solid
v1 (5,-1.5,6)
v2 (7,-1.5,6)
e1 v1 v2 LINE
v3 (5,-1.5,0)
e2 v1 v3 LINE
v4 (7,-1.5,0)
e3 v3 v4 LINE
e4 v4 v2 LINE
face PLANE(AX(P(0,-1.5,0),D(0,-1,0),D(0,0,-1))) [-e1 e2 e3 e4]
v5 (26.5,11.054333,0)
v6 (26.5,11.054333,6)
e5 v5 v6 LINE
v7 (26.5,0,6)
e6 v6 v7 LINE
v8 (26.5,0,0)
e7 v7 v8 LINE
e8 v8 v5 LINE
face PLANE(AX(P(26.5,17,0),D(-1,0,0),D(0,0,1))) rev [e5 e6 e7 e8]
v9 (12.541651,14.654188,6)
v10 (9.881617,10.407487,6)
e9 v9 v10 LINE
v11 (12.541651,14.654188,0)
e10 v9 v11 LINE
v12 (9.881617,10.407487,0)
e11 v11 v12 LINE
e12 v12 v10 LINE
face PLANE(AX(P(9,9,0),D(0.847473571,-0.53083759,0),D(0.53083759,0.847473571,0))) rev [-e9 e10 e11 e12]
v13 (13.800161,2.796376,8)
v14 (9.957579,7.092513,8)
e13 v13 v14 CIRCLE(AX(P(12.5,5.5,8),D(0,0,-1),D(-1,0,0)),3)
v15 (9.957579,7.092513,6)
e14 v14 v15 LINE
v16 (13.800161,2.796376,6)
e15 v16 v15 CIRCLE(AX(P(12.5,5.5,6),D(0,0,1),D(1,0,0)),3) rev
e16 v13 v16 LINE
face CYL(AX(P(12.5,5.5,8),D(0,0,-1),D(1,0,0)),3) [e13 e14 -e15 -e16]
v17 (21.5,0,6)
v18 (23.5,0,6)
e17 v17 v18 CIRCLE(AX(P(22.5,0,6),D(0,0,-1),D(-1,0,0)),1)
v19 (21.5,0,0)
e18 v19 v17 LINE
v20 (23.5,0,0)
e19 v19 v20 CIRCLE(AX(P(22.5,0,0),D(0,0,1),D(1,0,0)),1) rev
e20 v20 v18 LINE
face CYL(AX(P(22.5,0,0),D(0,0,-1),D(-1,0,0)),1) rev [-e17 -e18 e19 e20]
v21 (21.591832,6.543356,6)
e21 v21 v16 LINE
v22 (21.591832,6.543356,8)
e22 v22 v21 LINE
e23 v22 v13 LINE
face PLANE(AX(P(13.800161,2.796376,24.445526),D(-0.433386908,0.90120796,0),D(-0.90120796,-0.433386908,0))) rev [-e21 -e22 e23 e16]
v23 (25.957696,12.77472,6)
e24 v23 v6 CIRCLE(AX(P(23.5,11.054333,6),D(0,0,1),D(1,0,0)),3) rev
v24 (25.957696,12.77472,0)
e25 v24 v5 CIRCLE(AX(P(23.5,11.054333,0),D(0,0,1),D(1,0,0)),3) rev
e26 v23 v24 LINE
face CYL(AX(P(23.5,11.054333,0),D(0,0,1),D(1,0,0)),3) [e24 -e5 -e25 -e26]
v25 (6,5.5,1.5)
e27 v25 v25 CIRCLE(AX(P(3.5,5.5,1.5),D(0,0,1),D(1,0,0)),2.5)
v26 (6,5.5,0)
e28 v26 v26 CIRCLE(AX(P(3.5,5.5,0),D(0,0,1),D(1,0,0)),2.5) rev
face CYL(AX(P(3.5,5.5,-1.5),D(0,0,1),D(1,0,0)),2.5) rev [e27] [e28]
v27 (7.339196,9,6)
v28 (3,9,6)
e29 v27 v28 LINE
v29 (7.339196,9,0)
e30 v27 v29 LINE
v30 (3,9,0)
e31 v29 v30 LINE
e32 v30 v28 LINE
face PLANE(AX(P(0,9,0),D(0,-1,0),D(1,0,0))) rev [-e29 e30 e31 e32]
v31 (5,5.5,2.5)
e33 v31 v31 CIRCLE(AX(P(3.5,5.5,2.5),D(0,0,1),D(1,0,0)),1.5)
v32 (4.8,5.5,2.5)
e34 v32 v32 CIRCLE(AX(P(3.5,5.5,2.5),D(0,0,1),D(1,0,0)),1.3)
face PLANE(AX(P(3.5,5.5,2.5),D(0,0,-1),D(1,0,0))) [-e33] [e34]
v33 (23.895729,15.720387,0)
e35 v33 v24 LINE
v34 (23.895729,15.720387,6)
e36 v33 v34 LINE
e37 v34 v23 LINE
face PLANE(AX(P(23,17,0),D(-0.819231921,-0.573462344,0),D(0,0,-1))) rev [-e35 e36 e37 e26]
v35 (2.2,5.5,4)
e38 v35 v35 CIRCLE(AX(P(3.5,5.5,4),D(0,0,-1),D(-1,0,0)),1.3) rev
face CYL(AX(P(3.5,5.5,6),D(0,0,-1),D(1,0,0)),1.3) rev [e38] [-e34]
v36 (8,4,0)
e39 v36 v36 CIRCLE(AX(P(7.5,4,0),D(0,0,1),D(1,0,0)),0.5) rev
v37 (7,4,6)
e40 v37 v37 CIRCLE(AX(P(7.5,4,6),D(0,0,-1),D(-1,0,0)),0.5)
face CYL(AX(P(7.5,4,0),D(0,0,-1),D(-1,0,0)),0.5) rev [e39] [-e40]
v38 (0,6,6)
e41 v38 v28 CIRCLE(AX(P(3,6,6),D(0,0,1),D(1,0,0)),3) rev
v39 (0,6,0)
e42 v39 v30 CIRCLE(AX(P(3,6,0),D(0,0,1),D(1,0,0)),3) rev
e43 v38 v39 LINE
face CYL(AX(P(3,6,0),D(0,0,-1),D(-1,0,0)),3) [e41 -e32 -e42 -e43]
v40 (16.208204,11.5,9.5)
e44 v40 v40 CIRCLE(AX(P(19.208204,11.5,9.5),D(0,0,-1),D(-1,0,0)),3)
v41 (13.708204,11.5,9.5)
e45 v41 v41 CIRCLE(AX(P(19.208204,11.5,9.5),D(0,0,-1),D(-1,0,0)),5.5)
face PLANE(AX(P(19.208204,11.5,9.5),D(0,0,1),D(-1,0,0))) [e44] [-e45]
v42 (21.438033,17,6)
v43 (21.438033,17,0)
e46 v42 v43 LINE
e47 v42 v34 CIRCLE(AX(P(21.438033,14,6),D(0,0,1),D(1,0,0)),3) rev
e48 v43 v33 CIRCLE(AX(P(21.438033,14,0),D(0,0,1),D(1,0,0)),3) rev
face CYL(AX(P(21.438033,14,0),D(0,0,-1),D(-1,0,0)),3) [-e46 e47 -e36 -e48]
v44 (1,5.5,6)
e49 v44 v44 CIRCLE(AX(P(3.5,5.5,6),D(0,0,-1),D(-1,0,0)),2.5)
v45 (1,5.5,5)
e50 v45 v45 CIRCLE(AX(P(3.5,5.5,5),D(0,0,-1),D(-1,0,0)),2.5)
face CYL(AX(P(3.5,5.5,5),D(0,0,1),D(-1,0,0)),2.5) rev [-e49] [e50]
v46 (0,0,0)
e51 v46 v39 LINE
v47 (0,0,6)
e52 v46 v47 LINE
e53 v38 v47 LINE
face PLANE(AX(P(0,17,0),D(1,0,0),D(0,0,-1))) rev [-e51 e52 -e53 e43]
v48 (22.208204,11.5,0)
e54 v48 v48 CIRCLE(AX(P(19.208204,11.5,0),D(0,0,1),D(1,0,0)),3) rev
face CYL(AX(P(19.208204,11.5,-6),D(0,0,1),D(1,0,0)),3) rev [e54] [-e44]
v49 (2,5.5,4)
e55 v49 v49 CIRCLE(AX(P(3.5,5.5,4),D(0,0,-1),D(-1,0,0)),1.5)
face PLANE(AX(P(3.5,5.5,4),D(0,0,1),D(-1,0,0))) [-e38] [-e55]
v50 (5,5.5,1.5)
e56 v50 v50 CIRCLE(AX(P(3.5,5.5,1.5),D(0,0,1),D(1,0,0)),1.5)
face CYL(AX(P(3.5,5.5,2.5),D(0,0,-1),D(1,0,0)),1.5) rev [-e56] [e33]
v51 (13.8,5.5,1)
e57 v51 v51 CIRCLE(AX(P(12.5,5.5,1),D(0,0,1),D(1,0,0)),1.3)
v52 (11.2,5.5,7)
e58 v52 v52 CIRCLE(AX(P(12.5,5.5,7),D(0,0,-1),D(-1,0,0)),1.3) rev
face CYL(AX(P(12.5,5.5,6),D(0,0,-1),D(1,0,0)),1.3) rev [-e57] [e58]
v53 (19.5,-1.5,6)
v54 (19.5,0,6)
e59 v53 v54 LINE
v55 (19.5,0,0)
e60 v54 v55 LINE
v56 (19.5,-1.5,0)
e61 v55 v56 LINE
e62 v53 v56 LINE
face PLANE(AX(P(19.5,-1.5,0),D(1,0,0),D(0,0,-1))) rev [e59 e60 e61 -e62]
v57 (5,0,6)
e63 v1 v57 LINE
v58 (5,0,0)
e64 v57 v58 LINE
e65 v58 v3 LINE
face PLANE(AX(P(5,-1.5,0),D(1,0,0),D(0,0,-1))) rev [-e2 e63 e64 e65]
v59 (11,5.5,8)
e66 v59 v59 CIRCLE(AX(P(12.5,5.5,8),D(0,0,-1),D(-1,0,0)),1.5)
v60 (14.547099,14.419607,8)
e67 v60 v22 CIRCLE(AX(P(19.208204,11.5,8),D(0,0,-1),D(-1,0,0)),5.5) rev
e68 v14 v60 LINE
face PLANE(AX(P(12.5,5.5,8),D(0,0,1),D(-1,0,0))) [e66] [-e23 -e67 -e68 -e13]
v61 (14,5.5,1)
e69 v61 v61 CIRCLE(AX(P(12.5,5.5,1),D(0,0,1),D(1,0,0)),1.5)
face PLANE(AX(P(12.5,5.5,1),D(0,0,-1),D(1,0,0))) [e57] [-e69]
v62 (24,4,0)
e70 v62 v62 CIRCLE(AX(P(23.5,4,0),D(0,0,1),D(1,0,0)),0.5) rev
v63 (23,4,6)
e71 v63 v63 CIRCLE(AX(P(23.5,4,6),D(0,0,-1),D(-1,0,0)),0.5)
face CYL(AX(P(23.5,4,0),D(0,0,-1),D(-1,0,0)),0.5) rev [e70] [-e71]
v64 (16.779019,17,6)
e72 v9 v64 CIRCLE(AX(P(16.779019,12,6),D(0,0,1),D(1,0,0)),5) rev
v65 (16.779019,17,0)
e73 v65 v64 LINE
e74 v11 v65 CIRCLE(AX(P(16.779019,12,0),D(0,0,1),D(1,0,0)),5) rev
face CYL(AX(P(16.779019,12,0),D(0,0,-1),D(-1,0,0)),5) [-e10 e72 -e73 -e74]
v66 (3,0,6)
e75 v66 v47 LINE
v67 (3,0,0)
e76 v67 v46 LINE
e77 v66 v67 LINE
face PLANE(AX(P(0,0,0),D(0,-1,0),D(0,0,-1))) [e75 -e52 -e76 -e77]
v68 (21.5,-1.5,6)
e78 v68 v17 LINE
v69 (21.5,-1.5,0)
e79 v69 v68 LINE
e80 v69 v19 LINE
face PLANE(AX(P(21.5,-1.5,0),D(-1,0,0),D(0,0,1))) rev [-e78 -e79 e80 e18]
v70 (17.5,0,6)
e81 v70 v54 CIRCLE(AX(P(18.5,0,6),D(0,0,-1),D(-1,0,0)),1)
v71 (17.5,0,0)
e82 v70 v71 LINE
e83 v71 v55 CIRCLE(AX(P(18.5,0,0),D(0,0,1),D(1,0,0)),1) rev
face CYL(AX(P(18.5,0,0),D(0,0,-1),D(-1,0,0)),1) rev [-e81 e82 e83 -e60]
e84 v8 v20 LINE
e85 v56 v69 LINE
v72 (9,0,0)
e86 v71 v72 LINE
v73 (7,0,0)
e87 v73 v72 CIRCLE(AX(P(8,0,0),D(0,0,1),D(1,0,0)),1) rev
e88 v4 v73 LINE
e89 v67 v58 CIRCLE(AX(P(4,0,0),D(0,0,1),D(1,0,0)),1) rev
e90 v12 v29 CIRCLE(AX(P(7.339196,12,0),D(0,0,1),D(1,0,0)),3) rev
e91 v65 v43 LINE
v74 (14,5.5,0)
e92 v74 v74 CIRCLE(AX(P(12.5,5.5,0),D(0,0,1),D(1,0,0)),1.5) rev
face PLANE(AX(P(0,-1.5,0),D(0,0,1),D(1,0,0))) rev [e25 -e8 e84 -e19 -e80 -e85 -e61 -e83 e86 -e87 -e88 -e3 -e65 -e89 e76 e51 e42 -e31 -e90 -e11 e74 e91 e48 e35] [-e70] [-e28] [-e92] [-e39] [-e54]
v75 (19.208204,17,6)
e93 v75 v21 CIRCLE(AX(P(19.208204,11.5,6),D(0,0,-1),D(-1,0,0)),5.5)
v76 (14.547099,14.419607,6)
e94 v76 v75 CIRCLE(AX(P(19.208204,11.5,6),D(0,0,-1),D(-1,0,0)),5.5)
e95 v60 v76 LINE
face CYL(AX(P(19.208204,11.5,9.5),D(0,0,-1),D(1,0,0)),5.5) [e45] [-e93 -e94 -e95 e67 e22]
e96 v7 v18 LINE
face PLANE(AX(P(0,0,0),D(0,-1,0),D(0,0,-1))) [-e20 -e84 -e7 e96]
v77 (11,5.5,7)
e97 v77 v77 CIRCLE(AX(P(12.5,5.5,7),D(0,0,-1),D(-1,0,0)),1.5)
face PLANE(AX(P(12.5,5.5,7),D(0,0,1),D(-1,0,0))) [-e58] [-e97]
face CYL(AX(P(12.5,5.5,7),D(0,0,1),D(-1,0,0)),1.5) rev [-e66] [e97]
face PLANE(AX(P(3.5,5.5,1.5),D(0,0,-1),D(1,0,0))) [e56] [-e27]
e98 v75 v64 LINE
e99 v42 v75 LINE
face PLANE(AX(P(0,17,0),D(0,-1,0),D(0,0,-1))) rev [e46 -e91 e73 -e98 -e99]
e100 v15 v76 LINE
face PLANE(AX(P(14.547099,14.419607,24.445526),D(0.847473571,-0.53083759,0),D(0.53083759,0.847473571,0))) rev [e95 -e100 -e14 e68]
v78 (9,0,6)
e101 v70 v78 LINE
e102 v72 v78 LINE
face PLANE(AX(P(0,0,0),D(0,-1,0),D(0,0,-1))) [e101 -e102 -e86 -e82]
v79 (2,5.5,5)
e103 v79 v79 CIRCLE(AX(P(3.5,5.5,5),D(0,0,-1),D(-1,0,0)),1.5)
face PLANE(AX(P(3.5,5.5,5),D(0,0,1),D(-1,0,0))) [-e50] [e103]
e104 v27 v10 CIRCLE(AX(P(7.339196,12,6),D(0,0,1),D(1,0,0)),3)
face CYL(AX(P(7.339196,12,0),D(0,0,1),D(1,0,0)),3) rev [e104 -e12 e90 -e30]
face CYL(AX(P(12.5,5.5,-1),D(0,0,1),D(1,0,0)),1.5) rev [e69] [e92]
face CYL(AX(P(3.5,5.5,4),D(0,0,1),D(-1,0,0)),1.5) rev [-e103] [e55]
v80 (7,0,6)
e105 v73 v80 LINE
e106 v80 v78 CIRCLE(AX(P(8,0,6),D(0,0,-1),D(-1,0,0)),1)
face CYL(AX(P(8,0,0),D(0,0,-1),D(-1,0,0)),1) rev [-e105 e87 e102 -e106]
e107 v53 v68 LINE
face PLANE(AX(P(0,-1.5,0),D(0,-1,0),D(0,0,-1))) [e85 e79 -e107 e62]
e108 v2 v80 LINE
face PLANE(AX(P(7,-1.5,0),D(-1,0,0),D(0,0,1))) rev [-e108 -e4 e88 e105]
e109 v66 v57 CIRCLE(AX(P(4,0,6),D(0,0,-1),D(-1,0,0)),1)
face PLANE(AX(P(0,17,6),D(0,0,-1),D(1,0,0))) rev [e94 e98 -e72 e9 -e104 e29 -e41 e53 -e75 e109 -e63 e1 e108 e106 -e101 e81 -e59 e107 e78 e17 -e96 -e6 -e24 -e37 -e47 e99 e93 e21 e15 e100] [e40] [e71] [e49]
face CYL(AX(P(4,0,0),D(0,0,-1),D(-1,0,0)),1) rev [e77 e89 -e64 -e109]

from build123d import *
from build123d.topology import SkipClean

# Parameters (mm, degrees)
SKETCH1_W                            = 26.5
SKETCH1_H                            = 6
BOSS_EXTRUDE1_DEPTH                  = 17
SKETCH2_R                            = 1.5
CUT_EXTRUDE1_DEPTH                   = 1
SKETCH3_R                            = 1.3
CUT_EXTRUDE2_DEPTH                   = 32.878676259
SKETCH4_R                            = 3
CUT_EXTRUDE3_DEPTH                   = 33.050741021
SKETCH5_R                            = 2.5
CUT_EXTRUDE4_DEPTH                   = 1.5
SKETCH6_R                            = 1.5
CUT_EXTRUDE8_DEPTH                   = 1
SKETCH7_R                            = 1.3
CUT_EXTRUDE9_DEPTH                   = 32.678068123
CUT_EXTRUDE10_START                  = -1
SKETCH8_R                            = 2.5
CUT_EXTRUDE10_DEPTH                  = 1
CUT_EXTRUDE11_START                  = -1
SKETCH9_R                            = 1.5
CUT_EXTRUDE11_DEPTH                  = 1
SKETCH10_R                           = 5.5
SKETCH10_R_2                         = 3
BOSS_EXTRUDE2_DEPTH                  = 3.5
SKETCH11_R                           = 3
SKETCH11_R_2                         = 1.3
BOSS_EXTRUDE4_DEPTH                  = 2
CUT_EXTRUDE12_START                  = -1
SKETCH12_R                           = 1.5
CUT_EXTRUDE12_DEPTH                  = 1
SKETCH17_W                           = 2
SKETCH17_H                           = 6
BOSS_EXTRUDE6_DEPTH                  = 1.5
SKETCH18_R                           = 1
CUT_EXTRUDE17_DEPTH                  = 33.050741021
CHAMFER2_SIZE                        = 5
CHAMFER2_SIZE2                       = 3.5
FILLET11_R                           = 3
BOSS_EXTRUDE7_DEPTH                  = 2
CUT_EXTRUDE19_DEPTH                  = 33.050741021
FILLET13_R                           = 5
FILLET14_R                           = 3
FILLET15_R                           = 3
SKIZZE1_R                            = 0.5
SCHNITT_LINEAR_AUSTRAGEN1_DEPTH      = 33.050741021
SPIEGELN1_OUTLINE_R                  = 3
SPIEGELN1_OUTLINE_R_2                = 2.5
SPIEGELN1_OUTLINE_R_3                = 0.5
SPIEGELN1_OUTLINE_R_4                = 1.5
SPIEGELN1_DEPTH                      = 6
SPIEGELN1_START                      = 6
SPIEGELN1_2_OUTLINE_R                = 5.5
SPIEGELN1_2_OUTLINE_R_2              = 3
SPIEGELN1_2_DEPTH                    = 3.5
SPIEGELN1_3_OUTLINE_R                = 1.5
SPIEGELN1_3_DEPTH                    = 2
SPIEGELN1_START_2                    = 1.5
SPIEGELN1_4_OUTLINE_R                = 1.5
SPIEGELN1_4_OUTLINE_R_2              = 1.3
SPIEGELN1_4_OUTLINE_R_3              = 2.5
SPIEGELN1_4_DEPTH                    = 3.5
SPIEGELN1_START_3                    = 1
SPIEGELN1_5_OUTLINE_R                = 1.5
SPIEGELN1_5_OUTLINE_R_2              = 1.3
SPIEGELN1_5_DEPTH                    = 6
SPIEGELN1_START_4                    = 2.5
SPIEGELN1_6_OUTLINE_R                = 1.5
SPIEGELN1_6_OUTLINE_R_2              = 1.3
SPIEGELN1_6_DEPTH                    = 1.5
SCHNITT_LINEAR_AUSTRAGEN2_DEPTH      = 31.409702399
SCHNITT_LINEAR_AUSTRAGEN2_DEPTH_BACK = 31.409702399
SKIZZE2_W                            = 26.5
SKIZZE2_H                            = 9.5


# Read off the part's stored shape, not the designer's step: Spiegeln1
with BuildPart() as part:
    # Sketch1 → Boss-Extrude1 (new body)
    with BuildSketch(Plane(origin=(0, 0, 0), x_dir=(1, 0, 0), z_dir=(0, 1, 0))):
        with Locations((13.25, 3)):
            Rectangle(SKETCH1_W, SKETCH1_H)
    extrude(amount=BOSS_EXTRUDE1_DEPTH)

    # Sketch2 → Cut-Extrude1 (cut)
    with BuildSketch(Plane.XY):
        with Locations((12.5, 5.5)):
            Circle(SKETCH2_R)
    extrude(amount=-CUT_EXTRUDE1_DEPTH, mode=Mode.SUBTRACT)

    # Sketch3 → Cut-Extrude2 (cut, through all)
    with BuildSketch(Plane.XY.offset(-1)):
        with Locations((12.5, 5.5)):
            Circle(SKETCH3_R)
    extrude(amount=-CUT_EXTRUDE2_DEPTH, mode=Mode.SUBTRACT)

    # Sketch4 → Cut-Extrude3 (cut, through all)
    with BuildSketch(Plane.XY):
        with Locations((19.208203932, 11.5)):
            Circle(SKETCH4_R)
    extrude(amount=-CUT_EXTRUDE3_DEPTH, mode=Mode.SUBTRACT)

    # Sketch5 → Cut-Extrude4 (cut)
    with BuildSketch(Plane.XY):
        with Locations((3.5, 5.5)):
            Circle(SKETCH5_R)
    extrude(amount=-CUT_EXTRUDE4_DEPTH, mode=Mode.SUBTRACT)

    # Sketch6 → Cut-Extrude8 (cut)
    with BuildSketch(Plane.XY.offset(-1.5)):
        with Locations((3.5, 5.5)):
            Circle(SKETCH6_R)
    extrude(amount=-CUT_EXTRUDE8_DEPTH, mode=Mode.SUBTRACT)

    # Sketch7 → Cut-Extrude9 (cut, through all)
    with BuildSketch(Plane.XY.offset(-2.5)):
        with Locations((3.5, 5.5)):
            Circle(SKETCH7_R)
    extrude(amount=-CUT_EXTRUDE9_DEPTH, mode=Mode.SUBTRACT)

    # Sketch8 → Cut-Extrude10 (cut)
    with BuildSketch(Plane(origin=(0, 0, -6), x_dir=(-1, 0, 0), z_dir=(0, 0, -1)).offset(CUT_EXTRUDE10_START)):
        with Locations(Location((-3.5, 5.5, 0), (0, 0, 180))):
            Circle(SKETCH8_R)
    extrude(amount=CUT_EXTRUDE10_DEPTH, mode=Mode.SUBTRACT)

    # Sketch9 → Cut-Extrude11 (cut)
    with BuildSketch(Plane(origin=(0, 0, -5), x_dir=(-1, 0, 0), z_dir=(0, 0, -1)).offset(CUT_EXTRUDE11_START)):
        with Locations(Location((-3.5, 5.5, 0), (0, 0, 180))):
            Circle(SKETCH9_R)
    extrude(amount=CUT_EXTRUDE11_DEPTH, mode=Mode.SUBTRACT)

    # Sketch10 → Boss-Extrude2 (add)
    with BuildSketch(Plane(origin=(0, 0, -6), x_dir=(-1, 0, 0), z_dir=(0, 0, -1))):
        with Locations(Location((-19.208203932, 11.5, 0), (0, 0, 90))):
            Circle(SKETCH10_R)
        with Locations(Location((-19.208203932, 11.5, 0), (0, 0, 180))):
            Circle(SKETCH10_R_2, mode=Mode.SUBTRACT)
    extrude(amount=BOSS_EXTRUDE2_DEPTH)

    # Sketch11 → Boss-Extrude4 (add)
    with BuildSketch(Plane(origin=(0, 0, -6), x_dir=(-1, 0, 0), z_dir=(0, 0, -1))):
        with Locations(Location((-12.5, 5.5, 0), (0, 0, 180))):
            Circle(SKETCH11_R)
        with Locations(Location((-12.5, 5.5, 0), (0, 0, 180))):
            Circle(SKETCH11_R_2, mode=Mode.SUBTRACT)
    extrude(amount=BOSS_EXTRUDE4_DEPTH)

    # Sketch12 → Cut-Extrude12 (cut)
    with BuildSketch(Plane(origin=(0, 0, -8), x_dir=(-1, 0, 0), z_dir=(0, 0, -1)).offset(CUT_EXTRUDE12_START)):
        with Locations(Location((-12.5, 5.5, 0), (0, 0, 180))):
            Circle(SKETCH12_R)
    extrude(amount=CUT_EXTRUDE12_DEPTH, mode=Mode.SUBTRACT)

    # Sketch17 → Boss-Extrude6 (add)
    with BuildSketch(Plane.XZ):
        with Locations((6, -3)):
            Rectangle(SKETCH17_W, SKETCH17_H)
        with Locations((20.5, -3)):
            Rectangle(SKETCH17_W, SKETCH17_H)
    extrude(amount=BOSS_EXTRUDE6_DEPTH)

    # Sketch18 → Cut-Extrude17 (cut, through all)
    with BuildSketch(Plane(origin=(0, 0, -6), x_dir=(-1, 0, 0), z_dir=(0, 0, -1))):
        with Locations((-22.5, 0)):
            Circle(SKETCH18_R)
        with Locations((-18.5, 0)):
            Circle(SKETCH18_R)
        with Locations((-8, 0)):
            Circle(SKETCH18_R)
        with Locations((-4, 0)):
            Circle(SKETCH18_R)
    extrude(amount=-CUT_EXTRUDE17_DEPTH, mode=Mode.SUBTRACT)

    # Chamfer2
    chamfer2_edges = [part.edges().sort_by_distance(p)[0] for p in [
        (26.5, 17, -3),
    ]]
    chamfer2_side = [part.faces().sort_by_distance(p)[0] for p in [
        (26.5, 8.5, -3),
    ]]
    chamfer(chamfer2_edges, length=CHAMFER2_SIZE, length2=CHAMFER2_SIZE2, reference=chamfer2_side[0])

    # Fillet11
    fillet11_edges = [part.edges().sort_by_distance(p)[0] for p in [
        (23, 17, -3),
        (26.5, 12, -3),
    ]]
    fillet(fillet11_edges, radius=FILLET11_R)

    # Sketch19 → Boss-Extrude7 (add)
    with BuildSketch(Plane(origin=(0, 0, -6), x_dir=(-1, 0, 0), z_dir=(0, 0, -1))):
        with BuildLine():
            Line((-14.547099294, 14.419606745), (-9.957579288, 7.09251277))
            ThreePointArc((-9.957579288, 7.09251277), (-14.736067977, 7.5), (-13.800160725, 2.796376119))
            Line((-13.800160725, 2.796376119), (-21.591831928, 6.543356218))
            ThreePointArc((-21.591831928, 6.543356218), (-15.108745974, 7.833333333), (-14.547099294, 14.419606745))
        make_face()
    extrude(amount=BOSS_EXTRUDE7_DEPTH)

    # Sketch20 → Cut-Extrude19 (cut, through all)
    with BuildSketch(Plane(origin=(0, 0, -6), x_dir=(-1, 0, 0), z_dir=(0, 0, -1))):
        Polygon((0, 17), (-14.011012575, 17), (-9, 9), (0, 9), align=None)
    extrude(amount=-CUT_EXTRUDE19_DEPTH, mode=Mode.SUBTRACT)

    # Fillet13
    fillet13_edges = [part.edges().sort_by_distance(p)[0] for p in [
        (14.011012575, 17, -3),
    ]]
    fillet(fillet13_edges, radius=FILLET13_R)

    # Fillet14
    fillet14_edges = [part.edges().sort_by_distance(p)[0] for p in [
        (9, 9, -3),
    ]]
    fillet(fillet14_edges, radius=FILLET14_R)

    # Fillet15
    fillet15_edges = [part.edges().sort_by_distance(p)[0] for p in [
        (0, 9, -3),
    ]]
    fillet(fillet15_edges, radius=FILLET15_R)

    # Skizze1 → Schnitt-Linear austragen1 (cut, through all)
    with BuildSketch(Plane(origin=(0, 0, -6), x_dir=(-1, 0, 0), z_dir=(0, 0, -1))):
        with Locations((-23.5, 4)):
            Circle(SKIZZE1_R)
        with Locations((-7.5, 4)):
            Circle(SKIZZE1_R)
    extrude(amount=-SCHNITT_LINEAR_AUSTRAGEN1_DEPTH, mode=Mode.SUBTRACT)

    # Spiegeln1 outline → Spiegeln1 (add)
    with SkipClean():  # the faces are left unmerged after this step: merging them gives an invalid solid
        with BuildSketch(Plane.XY):
            with BuildLine():
                Line((21.438033315, 17), (16.779018718, 17))
                ThreePointArc((16.779018718, 17), (14.357339523, 16.374410803), (12.541650865, 14.65418795))
                Line((12.541650865, 14.65418795), (9.881617026, 10.40748723))
                ThreePointArc((9.881617026, 10.40748723), (8.792203831, 9.375353518), (7.339196314, 9))
                Line((7.339196314, 9), (3, 9))
                ThreePointArc((3, 9), (0.878679656, 8.121320344), (0, 6))
                Line((0, 6), (0, 0))
                Line((0, 0), (3, 0))
                ThreePointArc((3, 0), (4, 1), (5, 0))
                Line((5, 0), (5, -1.5))
                Line((5, -1.5), (7, -1.5))
                Line((7, -1.5), (7, 0))
                ThreePointArc((7, 0), (8, 1), (9, 0))
                Line((9, 0), (17.5, 0))
                ThreePointArc((17.5, 0), (18.5, 1), (19.5, 0))
                Line((19.5, 0), (19.5, -1.5))
                Line((19.5, -1.5), (21.5, -1.5))
                Line((21.5, -1.5), (21.5, 0))
                ThreePointArc((21.5, 0), (22.5, 1), (23.5, 0))
                Line((23.5, 0), (26.5, 0))
                Line((26.5, 0), (26.5, 11.054333308))
                ThreePointArc((26.5, 11.054333308), (26.361213666, 11.956251462), (25.957695762, 12.774720341))
                Line((25.957695762, 12.774720341), (23.895729077, 15.720387033))
                ThreePointArc((23.895729077, 15.720387033), (22.823464458, 16.660936029), (21.438033315, 17))
            make_face()
            with Locations((19.208203932, 11.5)):
                Circle(SPIEGELN1_OUTLINE_R, mode=Mode.SUBTRACT)
            with Locations((3.5, 5.5)):
                Circle(SPIEGELN1_OUTLINE_R_2, mode=Mode.SUBTRACT)
            with Locations((7.5, 4)):
                Circle(SPIEGELN1_OUTLINE_R_3, mode=Mode.SUBTRACT)
            with Locations((23.5, 4)):
                Circle(SPIEGELN1_OUTLINE_R_3, mode=Mode.SUBTRACT)
            with Locations((12.5, 5.5)):
                Circle(SPIEGELN1_OUTLINE_R_4, mode=Mode.SUBTRACT)
        extrude(amount=SPIEGELN1_DEPTH)

    # Spiegeln1 2 outline → Spiegeln1 2 (add)
    with SkipClean():  # the faces are left unmerged after this step: merging them gives an invalid solid
        with BuildSketch(Plane.XY.offset(SPIEGELN1_START)):
            with Locations((19.208203932, 11.5)):
                Circle(SPIEGELN1_2_OUTLINE_R)
            with Locations((19.208203932, 11.5)):
                Circle(SPIEGELN1_2_OUTLINE_R_2, mode=Mode.SUBTRACT)
        extrude(amount=SPIEGELN1_2_DEPTH)

    # Spiegeln1 3 outline → Spiegeln1 3 (add)
    with SkipClean():  # the faces are left unmerged after this step: merging them gives an invalid solid
        with BuildSketch(Plane.XY.offset(SPIEGELN1_START)):
            with BuildLine():
                ThreePointArc((21.591831928, 6.543356218), (15.108745973, 7.833333333), (14.547099293, 14.419606745))
                Line((14.547099293, 14.419606745), (9.957579288, 7.09251277))
                ThreePointArc((9.957579288, 7.09251277), (10.263932023, 3.5), (13.800160725, 2.796376119))
                Line((13.800160725, 2.796376119), (21.591831928, 6.543356218))
            make_face()
            with Locations((12.5, 5.5)):
                Circle(SPIEGELN1_3_OUTLINE_R, mode=Mode.SUBTRACT)
        extrude(amount=SPIEGELN1_3_DEPTH)

    # Spiegeln1 4 outline → Spiegeln1 4 (add)
    # profile 1 of 2: a face of its own
    with SkipClean():  # the faces are left unmerged after this step: merging them gives an invalid solid
        with BuildSketch(Plane.XY.offset(SPIEGELN1_START_2)):
            with Locations((12.5, 5.5)):
                Circle(SPIEGELN1_4_OUTLINE_R)
            with Locations((12.5, 5.5)):
                Circle(SPIEGELN1_4_OUTLINE_R_2, mode=Mode.SUBTRACT)
        # profile 2 of 2: a face of its own
        with BuildSketch(Plane.XY.offset(SPIEGELN1_START_2)):
            with Locations((3.5, 5.5)):
                Circle(SPIEGELN1_4_OUTLINE_R_3)
            with Locations((3.5, 5.5)):
                Circle(SPIEGELN1_4_OUTLINE_R, mode=Mode.SUBTRACT)
        extrude(amount=SPIEGELN1_4_DEPTH)

    # Spiegeln1 5 outline → Spiegeln1 5 (add)
    with SkipClean():  # the faces are left unmerged after this step: merging them gives an invalid solid
        with BuildSketch(Plane.XY.offset(SPIEGELN1_START_3)):
            with Locations((12.5, 5.5)):
                Circle(SPIEGELN1_5_OUTLINE_R)
            with Locations((12.5, 5.5)):
                Circle(SPIEGELN1_5_OUTLINE_R_2, mode=Mode.SUBTRACT)
        extrude(amount=SPIEGELN1_5_DEPTH)

    # Spiegeln1 6 outline → Spiegeln1 6 (add)
    with SkipClean():  # the faces are left unmerged after this step: merging them gives an invalid solid
        with BuildSketch(Plane.XY.offset(SPIEGELN1_START_4)):
            with Locations((3.5, 5.5)):
                Circle(SPIEGELN1_6_OUTLINE_R)
            with Locations((3.5, 5.5)):
                Circle(SPIEGELN1_6_OUTLINE_R_2, mode=Mode.SUBTRACT)
        extrude(amount=SPIEGELN1_6_DEPTH)

    # Skizze2 → Schnitt-Linear austragen2 (cut, two sides: drawn at the far end of the back side and taken through both)
    with BuildSketch(Plane(origin=(0, 5.5, 0), x_dir=(1, 0, 0), z_dir=(0, 1, 0)).offset(-SCHNITT_LINEAR_AUSTRAGEN2_DEPTH_BACK)):
        with Locations((13.25, 4.75)):
            Rectangle(SKIZZE2_W, SKIZZE2_H)
    extrude(amount=SCHNITT_LINEAR_AUSTRAGEN2_DEPTH + SCHNITT_LINEAR_AUSTRAGEN2_DEPTH_BACK, mode=Mode.SUBTRACT)


solid = part.part
